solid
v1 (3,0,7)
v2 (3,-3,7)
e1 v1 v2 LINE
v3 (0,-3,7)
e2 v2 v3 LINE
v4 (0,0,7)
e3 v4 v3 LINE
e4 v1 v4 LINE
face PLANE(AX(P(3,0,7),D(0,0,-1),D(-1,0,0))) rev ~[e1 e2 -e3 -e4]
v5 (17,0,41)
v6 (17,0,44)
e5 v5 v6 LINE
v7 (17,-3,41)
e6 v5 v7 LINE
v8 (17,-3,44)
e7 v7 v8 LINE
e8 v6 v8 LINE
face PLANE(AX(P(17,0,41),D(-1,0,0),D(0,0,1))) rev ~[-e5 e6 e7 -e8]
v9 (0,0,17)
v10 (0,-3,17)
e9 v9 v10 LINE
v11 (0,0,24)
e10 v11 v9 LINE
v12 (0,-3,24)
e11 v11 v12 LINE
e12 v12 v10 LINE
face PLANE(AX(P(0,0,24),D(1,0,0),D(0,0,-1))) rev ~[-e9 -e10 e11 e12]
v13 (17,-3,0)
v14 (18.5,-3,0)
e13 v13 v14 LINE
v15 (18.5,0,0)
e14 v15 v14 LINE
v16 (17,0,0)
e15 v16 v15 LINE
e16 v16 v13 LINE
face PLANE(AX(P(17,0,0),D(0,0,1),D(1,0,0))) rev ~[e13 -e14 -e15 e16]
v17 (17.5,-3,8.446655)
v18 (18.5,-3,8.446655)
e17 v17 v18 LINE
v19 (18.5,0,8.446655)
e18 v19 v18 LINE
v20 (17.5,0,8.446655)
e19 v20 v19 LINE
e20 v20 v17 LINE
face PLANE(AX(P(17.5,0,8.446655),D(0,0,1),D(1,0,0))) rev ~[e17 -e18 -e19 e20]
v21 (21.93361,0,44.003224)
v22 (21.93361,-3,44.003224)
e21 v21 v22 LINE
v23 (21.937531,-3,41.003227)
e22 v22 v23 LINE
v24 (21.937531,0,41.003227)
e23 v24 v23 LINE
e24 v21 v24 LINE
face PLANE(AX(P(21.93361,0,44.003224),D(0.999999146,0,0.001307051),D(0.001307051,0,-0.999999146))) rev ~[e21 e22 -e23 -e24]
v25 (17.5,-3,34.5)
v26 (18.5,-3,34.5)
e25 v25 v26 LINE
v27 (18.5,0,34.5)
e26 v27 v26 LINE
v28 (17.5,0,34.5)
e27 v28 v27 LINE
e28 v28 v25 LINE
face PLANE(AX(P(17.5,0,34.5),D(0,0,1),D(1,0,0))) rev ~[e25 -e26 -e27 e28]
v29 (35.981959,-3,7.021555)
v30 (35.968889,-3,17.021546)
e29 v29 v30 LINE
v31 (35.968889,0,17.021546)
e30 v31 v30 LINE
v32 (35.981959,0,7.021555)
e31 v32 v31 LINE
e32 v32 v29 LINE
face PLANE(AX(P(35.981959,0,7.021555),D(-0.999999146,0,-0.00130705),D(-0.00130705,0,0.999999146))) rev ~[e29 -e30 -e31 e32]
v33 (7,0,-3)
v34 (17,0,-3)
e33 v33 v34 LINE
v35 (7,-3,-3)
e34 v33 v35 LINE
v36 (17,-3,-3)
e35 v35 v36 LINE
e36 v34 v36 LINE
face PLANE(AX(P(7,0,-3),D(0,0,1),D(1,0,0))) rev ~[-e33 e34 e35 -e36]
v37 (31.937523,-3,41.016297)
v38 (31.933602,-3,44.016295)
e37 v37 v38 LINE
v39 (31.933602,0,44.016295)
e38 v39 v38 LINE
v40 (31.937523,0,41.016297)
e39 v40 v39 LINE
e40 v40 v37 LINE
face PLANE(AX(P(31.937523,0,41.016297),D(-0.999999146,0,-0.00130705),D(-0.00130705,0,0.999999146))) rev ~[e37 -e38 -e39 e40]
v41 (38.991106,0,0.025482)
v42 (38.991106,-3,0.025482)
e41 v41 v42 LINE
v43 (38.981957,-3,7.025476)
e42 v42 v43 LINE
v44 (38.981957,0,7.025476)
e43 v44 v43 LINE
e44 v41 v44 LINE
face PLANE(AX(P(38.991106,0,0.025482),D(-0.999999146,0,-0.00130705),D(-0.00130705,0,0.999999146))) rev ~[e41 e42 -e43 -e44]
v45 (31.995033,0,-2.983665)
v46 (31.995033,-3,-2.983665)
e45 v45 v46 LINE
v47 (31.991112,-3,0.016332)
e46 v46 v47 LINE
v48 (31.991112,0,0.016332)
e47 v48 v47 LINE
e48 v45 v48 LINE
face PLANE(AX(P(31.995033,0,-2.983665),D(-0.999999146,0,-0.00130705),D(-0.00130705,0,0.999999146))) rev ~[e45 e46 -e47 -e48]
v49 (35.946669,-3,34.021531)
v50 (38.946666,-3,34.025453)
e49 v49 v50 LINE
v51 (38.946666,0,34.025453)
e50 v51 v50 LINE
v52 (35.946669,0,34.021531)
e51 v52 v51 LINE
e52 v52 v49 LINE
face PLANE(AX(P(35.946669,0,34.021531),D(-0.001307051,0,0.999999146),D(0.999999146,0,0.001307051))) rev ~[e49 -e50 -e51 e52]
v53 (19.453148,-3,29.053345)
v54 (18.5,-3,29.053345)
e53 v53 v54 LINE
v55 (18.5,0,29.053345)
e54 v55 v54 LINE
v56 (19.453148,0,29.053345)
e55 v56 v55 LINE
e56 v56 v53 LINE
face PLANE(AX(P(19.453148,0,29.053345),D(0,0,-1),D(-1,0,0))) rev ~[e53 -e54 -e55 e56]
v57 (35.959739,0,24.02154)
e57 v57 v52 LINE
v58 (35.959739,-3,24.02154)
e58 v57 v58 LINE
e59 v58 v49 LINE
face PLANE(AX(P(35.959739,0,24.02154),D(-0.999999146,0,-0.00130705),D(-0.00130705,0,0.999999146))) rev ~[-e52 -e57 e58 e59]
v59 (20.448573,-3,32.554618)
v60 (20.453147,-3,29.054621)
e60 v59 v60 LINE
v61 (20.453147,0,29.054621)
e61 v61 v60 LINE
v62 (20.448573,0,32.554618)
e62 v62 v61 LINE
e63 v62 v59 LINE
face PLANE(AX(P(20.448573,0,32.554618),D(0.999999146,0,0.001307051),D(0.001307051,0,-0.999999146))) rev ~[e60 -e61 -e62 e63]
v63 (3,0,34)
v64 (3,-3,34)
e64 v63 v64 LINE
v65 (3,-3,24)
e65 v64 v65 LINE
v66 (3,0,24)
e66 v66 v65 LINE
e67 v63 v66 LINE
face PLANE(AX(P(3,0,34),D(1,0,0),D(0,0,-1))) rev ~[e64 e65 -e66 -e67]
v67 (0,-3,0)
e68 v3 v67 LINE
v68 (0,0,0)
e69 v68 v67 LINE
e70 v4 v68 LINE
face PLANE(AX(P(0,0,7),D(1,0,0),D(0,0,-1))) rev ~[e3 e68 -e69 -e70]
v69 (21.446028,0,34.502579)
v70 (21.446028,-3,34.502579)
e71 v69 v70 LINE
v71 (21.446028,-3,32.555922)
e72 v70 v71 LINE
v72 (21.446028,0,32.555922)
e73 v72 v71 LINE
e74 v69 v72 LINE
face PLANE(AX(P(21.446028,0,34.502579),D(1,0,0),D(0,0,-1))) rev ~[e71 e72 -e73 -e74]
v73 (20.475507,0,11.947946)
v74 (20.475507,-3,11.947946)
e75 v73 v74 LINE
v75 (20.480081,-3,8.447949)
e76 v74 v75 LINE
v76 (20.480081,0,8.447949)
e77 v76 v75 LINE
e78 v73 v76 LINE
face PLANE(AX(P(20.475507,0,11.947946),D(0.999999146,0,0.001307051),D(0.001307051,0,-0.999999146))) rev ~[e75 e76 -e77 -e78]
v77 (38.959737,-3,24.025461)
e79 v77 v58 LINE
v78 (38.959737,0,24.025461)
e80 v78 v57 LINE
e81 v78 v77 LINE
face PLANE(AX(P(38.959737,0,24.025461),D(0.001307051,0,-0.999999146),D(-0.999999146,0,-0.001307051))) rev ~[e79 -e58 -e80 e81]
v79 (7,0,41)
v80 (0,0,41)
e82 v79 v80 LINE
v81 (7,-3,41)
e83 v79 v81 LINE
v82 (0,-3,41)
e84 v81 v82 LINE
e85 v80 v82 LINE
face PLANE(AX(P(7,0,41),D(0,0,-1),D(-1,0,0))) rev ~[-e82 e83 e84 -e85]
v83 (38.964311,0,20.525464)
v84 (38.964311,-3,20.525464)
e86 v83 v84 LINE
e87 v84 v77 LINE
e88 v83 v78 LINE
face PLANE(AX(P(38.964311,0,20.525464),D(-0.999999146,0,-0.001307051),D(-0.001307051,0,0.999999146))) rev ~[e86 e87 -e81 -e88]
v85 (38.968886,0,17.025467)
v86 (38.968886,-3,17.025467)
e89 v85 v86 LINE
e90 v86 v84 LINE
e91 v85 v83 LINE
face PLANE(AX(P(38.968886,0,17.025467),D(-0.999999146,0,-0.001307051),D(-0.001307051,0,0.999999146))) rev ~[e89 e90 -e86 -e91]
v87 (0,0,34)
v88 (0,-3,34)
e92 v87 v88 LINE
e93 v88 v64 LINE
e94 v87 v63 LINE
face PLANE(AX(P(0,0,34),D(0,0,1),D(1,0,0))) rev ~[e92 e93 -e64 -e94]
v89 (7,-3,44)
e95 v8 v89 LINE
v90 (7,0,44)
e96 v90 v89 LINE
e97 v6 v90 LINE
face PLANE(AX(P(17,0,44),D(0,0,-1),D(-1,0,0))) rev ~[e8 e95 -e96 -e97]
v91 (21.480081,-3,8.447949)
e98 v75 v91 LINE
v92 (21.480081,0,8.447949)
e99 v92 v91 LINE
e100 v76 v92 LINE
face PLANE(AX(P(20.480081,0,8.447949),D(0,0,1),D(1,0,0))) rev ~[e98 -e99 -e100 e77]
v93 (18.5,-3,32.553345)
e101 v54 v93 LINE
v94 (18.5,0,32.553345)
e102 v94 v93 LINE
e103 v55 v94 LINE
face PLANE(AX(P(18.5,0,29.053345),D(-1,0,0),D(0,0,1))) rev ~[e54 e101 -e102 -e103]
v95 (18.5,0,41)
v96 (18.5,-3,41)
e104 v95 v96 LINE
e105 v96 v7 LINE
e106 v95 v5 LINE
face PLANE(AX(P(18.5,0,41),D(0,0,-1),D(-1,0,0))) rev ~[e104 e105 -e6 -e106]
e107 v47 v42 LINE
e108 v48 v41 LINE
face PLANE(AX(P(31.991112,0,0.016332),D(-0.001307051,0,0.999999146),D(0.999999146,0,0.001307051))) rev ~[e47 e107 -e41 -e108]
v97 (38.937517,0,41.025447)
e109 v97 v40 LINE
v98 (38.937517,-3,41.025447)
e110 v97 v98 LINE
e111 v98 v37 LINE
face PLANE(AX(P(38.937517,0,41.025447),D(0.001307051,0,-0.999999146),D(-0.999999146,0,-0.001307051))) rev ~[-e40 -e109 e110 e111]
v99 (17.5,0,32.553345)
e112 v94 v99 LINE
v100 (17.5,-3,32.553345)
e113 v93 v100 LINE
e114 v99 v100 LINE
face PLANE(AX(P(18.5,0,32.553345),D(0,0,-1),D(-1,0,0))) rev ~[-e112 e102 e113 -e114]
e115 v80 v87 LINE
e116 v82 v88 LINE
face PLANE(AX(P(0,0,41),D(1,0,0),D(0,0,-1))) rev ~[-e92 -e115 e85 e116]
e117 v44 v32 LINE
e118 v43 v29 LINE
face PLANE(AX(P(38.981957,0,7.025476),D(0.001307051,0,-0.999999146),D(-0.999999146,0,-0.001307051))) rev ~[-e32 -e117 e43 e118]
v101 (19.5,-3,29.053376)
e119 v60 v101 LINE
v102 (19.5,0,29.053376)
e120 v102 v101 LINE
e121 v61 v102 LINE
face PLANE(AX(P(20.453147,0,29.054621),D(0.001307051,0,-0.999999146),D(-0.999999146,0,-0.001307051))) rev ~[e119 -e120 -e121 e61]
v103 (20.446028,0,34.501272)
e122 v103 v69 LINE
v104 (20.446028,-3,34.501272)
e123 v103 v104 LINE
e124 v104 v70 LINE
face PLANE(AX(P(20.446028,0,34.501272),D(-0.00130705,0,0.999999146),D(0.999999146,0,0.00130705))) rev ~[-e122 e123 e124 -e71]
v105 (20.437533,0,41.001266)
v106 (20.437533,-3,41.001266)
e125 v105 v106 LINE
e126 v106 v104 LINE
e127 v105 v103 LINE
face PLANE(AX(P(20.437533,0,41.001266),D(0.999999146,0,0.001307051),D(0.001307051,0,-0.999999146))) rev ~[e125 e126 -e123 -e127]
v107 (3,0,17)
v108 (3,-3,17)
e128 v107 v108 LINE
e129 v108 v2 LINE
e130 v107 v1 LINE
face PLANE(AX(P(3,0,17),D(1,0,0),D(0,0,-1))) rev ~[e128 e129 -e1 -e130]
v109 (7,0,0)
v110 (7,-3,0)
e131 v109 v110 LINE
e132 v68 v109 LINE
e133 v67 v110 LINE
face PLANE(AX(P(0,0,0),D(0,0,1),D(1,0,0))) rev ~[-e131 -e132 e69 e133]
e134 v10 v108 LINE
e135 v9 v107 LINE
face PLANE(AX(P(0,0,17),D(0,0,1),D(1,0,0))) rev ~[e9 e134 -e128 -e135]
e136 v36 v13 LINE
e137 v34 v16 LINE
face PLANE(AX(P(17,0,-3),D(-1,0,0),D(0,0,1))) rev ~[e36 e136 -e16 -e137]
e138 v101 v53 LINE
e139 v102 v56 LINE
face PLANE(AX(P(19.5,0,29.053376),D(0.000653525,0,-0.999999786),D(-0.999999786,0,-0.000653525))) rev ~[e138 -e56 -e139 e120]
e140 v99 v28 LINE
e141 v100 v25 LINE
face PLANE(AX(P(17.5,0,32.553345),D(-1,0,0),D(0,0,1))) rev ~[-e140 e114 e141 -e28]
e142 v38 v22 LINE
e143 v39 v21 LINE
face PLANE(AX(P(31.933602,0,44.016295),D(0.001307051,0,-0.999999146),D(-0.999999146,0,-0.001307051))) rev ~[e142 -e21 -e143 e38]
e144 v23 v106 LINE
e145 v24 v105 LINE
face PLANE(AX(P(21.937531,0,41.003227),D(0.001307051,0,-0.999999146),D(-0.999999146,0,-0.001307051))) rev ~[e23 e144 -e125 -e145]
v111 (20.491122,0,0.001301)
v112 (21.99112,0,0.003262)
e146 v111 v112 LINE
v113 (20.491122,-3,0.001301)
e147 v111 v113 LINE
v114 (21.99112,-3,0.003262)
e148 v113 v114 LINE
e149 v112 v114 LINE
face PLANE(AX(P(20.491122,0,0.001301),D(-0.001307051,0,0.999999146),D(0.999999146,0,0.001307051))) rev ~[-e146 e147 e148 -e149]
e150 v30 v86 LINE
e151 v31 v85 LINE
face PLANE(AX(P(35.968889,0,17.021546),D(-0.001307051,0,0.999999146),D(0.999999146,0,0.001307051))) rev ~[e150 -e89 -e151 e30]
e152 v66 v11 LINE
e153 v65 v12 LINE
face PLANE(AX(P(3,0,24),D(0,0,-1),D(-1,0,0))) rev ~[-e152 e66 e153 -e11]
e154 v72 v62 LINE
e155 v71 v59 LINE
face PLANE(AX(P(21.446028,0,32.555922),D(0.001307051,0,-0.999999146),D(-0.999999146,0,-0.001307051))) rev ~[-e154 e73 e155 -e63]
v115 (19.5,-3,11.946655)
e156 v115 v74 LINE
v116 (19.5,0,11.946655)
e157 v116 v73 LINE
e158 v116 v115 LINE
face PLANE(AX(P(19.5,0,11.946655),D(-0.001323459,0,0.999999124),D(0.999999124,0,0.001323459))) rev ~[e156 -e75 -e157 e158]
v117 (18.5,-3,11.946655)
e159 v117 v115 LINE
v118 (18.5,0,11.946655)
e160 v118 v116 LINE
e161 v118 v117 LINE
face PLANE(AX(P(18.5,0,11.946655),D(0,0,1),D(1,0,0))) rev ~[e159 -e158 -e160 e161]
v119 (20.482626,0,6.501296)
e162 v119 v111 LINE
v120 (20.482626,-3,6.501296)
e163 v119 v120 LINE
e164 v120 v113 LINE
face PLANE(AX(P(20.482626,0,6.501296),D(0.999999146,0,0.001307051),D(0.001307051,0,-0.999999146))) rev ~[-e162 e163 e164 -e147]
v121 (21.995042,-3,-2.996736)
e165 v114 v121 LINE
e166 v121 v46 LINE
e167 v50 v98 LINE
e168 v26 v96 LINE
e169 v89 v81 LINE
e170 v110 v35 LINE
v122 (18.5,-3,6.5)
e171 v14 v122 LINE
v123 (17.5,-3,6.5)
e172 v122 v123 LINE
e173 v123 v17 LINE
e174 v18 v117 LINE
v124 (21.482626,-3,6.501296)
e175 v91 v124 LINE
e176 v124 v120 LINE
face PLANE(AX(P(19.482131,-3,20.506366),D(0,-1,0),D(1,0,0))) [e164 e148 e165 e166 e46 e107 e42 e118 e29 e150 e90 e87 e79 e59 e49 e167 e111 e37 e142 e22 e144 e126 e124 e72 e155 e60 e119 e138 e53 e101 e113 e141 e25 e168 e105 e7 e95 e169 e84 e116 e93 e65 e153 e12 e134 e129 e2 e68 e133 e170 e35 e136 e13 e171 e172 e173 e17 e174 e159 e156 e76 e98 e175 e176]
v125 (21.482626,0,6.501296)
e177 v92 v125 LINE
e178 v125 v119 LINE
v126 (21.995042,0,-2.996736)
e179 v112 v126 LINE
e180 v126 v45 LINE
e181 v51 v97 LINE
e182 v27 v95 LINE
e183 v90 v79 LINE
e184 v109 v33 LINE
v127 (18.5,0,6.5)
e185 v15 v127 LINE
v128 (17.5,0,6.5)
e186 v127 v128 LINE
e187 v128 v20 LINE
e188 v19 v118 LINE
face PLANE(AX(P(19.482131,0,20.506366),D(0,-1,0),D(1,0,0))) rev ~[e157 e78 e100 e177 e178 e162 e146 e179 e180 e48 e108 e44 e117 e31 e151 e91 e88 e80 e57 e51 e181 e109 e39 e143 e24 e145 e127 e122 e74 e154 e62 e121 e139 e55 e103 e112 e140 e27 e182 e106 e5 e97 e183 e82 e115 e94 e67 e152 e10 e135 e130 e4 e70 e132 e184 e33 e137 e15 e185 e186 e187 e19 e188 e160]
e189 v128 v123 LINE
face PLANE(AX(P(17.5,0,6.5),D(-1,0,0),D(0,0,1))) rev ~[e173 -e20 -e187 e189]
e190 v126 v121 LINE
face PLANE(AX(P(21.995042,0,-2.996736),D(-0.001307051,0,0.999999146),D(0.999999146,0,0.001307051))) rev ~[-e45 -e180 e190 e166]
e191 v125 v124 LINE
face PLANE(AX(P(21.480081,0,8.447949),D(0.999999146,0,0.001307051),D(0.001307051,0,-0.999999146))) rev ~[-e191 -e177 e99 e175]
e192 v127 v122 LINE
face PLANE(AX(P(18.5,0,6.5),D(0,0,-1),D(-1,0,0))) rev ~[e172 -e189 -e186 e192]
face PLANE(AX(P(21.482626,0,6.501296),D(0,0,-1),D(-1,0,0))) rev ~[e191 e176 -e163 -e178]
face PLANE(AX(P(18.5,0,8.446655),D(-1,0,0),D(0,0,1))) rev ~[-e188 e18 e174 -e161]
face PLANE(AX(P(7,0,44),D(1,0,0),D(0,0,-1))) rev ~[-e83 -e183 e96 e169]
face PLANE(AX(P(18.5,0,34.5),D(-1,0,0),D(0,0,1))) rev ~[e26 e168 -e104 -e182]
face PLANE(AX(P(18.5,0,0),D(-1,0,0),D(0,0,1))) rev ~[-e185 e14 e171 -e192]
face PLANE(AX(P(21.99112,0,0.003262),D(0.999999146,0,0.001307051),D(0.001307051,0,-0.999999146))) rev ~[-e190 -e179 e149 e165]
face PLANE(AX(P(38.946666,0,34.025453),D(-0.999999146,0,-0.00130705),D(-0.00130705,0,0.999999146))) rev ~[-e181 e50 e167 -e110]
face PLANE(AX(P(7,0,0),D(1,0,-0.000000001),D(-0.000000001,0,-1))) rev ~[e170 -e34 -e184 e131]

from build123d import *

# Parameters (mm, degrees)
F1_DEPTH = 3


# Not quite as in the source:
# - ends of sketch curves that miss each other by under 0.0002 mm in the source are joined


with BuildPart() as f1:
    # F0 (on Front) → F1 (new body)
    with BuildSketch(Plane.XZ):
        Polygon((3, 24), (0, 24), (0, 20.5), (0, 17), (3, 17), (2.9999999981, 7), (0, 7), (-2.3e-09, 0), (7, 0), (6.9999999985, -3), (17, -3), (16.9999999997, 0), (18.5, 0), (18.4999999999, 6.5), (17.5, 6.5), (17.5, 8.446655035), (18.5, 8.446655035), (18.4999999999, 11.946655035), (19.4755076583, 11.946655035), (19.5, 11.946655035), (20.4755068041, 11.9479460792), (20.4800814811, 8.4479490688), (21.480081481, 8.4479490688), (21.4826258575, 6.5012956966), (20.4826258575, 6.5012956966), (20.4911216861, 0.0013012489), (21.9911204047, 0.0032618247), (21.9950415565, -2.9967356127), (31.9950330143, -2.9836651074), (31.9911118642, 0.01633233), (38.9911058834, 0.0254816838), (38.981956532, 7.0254757044), (35.9819590922, 7.0215545528), (35.9688885888, 17.0215460109), (38.9688860243, 17.0254671625), (38.9643113475, 20.5254641728), (38.9597366706, 24.0254611832), (35.9597392332, 24.0215400316), (35.9466687298, 34.0215314897), (38.9466661653, 34.0254526413), (38.9375168138, 41.0254466619), (31.9375227909, 41.0162973082), (31.9336016407, 44.0162947456), (21.9336101812, 44.0032242403), (21.9375313331, 41.0032268029), (20.4375326141, 41.0012662271), (20.4460284426, 34.5012717793), (21.4460275885, 34.5025788298), (21.4460275882, 32.555922132), (20.448572819, 32.5546184071), (20.453147496, 29.0546213968), (19.49999996, 29.0533755837), (19.4531483501, 29.053344965), (18.5, 29.053344965), (18.5, 32.553344965), (17.5, 32.553344965), (17.5, 34.5), (18.5, 34.5), (18.5, 41), (17, 41), (17, 44), (7, 44), (7, 41), (0, 41), (0, 34), (3, 34), align=None)
    extrude(amount=F1_DEPTH)


solid = f1.part
